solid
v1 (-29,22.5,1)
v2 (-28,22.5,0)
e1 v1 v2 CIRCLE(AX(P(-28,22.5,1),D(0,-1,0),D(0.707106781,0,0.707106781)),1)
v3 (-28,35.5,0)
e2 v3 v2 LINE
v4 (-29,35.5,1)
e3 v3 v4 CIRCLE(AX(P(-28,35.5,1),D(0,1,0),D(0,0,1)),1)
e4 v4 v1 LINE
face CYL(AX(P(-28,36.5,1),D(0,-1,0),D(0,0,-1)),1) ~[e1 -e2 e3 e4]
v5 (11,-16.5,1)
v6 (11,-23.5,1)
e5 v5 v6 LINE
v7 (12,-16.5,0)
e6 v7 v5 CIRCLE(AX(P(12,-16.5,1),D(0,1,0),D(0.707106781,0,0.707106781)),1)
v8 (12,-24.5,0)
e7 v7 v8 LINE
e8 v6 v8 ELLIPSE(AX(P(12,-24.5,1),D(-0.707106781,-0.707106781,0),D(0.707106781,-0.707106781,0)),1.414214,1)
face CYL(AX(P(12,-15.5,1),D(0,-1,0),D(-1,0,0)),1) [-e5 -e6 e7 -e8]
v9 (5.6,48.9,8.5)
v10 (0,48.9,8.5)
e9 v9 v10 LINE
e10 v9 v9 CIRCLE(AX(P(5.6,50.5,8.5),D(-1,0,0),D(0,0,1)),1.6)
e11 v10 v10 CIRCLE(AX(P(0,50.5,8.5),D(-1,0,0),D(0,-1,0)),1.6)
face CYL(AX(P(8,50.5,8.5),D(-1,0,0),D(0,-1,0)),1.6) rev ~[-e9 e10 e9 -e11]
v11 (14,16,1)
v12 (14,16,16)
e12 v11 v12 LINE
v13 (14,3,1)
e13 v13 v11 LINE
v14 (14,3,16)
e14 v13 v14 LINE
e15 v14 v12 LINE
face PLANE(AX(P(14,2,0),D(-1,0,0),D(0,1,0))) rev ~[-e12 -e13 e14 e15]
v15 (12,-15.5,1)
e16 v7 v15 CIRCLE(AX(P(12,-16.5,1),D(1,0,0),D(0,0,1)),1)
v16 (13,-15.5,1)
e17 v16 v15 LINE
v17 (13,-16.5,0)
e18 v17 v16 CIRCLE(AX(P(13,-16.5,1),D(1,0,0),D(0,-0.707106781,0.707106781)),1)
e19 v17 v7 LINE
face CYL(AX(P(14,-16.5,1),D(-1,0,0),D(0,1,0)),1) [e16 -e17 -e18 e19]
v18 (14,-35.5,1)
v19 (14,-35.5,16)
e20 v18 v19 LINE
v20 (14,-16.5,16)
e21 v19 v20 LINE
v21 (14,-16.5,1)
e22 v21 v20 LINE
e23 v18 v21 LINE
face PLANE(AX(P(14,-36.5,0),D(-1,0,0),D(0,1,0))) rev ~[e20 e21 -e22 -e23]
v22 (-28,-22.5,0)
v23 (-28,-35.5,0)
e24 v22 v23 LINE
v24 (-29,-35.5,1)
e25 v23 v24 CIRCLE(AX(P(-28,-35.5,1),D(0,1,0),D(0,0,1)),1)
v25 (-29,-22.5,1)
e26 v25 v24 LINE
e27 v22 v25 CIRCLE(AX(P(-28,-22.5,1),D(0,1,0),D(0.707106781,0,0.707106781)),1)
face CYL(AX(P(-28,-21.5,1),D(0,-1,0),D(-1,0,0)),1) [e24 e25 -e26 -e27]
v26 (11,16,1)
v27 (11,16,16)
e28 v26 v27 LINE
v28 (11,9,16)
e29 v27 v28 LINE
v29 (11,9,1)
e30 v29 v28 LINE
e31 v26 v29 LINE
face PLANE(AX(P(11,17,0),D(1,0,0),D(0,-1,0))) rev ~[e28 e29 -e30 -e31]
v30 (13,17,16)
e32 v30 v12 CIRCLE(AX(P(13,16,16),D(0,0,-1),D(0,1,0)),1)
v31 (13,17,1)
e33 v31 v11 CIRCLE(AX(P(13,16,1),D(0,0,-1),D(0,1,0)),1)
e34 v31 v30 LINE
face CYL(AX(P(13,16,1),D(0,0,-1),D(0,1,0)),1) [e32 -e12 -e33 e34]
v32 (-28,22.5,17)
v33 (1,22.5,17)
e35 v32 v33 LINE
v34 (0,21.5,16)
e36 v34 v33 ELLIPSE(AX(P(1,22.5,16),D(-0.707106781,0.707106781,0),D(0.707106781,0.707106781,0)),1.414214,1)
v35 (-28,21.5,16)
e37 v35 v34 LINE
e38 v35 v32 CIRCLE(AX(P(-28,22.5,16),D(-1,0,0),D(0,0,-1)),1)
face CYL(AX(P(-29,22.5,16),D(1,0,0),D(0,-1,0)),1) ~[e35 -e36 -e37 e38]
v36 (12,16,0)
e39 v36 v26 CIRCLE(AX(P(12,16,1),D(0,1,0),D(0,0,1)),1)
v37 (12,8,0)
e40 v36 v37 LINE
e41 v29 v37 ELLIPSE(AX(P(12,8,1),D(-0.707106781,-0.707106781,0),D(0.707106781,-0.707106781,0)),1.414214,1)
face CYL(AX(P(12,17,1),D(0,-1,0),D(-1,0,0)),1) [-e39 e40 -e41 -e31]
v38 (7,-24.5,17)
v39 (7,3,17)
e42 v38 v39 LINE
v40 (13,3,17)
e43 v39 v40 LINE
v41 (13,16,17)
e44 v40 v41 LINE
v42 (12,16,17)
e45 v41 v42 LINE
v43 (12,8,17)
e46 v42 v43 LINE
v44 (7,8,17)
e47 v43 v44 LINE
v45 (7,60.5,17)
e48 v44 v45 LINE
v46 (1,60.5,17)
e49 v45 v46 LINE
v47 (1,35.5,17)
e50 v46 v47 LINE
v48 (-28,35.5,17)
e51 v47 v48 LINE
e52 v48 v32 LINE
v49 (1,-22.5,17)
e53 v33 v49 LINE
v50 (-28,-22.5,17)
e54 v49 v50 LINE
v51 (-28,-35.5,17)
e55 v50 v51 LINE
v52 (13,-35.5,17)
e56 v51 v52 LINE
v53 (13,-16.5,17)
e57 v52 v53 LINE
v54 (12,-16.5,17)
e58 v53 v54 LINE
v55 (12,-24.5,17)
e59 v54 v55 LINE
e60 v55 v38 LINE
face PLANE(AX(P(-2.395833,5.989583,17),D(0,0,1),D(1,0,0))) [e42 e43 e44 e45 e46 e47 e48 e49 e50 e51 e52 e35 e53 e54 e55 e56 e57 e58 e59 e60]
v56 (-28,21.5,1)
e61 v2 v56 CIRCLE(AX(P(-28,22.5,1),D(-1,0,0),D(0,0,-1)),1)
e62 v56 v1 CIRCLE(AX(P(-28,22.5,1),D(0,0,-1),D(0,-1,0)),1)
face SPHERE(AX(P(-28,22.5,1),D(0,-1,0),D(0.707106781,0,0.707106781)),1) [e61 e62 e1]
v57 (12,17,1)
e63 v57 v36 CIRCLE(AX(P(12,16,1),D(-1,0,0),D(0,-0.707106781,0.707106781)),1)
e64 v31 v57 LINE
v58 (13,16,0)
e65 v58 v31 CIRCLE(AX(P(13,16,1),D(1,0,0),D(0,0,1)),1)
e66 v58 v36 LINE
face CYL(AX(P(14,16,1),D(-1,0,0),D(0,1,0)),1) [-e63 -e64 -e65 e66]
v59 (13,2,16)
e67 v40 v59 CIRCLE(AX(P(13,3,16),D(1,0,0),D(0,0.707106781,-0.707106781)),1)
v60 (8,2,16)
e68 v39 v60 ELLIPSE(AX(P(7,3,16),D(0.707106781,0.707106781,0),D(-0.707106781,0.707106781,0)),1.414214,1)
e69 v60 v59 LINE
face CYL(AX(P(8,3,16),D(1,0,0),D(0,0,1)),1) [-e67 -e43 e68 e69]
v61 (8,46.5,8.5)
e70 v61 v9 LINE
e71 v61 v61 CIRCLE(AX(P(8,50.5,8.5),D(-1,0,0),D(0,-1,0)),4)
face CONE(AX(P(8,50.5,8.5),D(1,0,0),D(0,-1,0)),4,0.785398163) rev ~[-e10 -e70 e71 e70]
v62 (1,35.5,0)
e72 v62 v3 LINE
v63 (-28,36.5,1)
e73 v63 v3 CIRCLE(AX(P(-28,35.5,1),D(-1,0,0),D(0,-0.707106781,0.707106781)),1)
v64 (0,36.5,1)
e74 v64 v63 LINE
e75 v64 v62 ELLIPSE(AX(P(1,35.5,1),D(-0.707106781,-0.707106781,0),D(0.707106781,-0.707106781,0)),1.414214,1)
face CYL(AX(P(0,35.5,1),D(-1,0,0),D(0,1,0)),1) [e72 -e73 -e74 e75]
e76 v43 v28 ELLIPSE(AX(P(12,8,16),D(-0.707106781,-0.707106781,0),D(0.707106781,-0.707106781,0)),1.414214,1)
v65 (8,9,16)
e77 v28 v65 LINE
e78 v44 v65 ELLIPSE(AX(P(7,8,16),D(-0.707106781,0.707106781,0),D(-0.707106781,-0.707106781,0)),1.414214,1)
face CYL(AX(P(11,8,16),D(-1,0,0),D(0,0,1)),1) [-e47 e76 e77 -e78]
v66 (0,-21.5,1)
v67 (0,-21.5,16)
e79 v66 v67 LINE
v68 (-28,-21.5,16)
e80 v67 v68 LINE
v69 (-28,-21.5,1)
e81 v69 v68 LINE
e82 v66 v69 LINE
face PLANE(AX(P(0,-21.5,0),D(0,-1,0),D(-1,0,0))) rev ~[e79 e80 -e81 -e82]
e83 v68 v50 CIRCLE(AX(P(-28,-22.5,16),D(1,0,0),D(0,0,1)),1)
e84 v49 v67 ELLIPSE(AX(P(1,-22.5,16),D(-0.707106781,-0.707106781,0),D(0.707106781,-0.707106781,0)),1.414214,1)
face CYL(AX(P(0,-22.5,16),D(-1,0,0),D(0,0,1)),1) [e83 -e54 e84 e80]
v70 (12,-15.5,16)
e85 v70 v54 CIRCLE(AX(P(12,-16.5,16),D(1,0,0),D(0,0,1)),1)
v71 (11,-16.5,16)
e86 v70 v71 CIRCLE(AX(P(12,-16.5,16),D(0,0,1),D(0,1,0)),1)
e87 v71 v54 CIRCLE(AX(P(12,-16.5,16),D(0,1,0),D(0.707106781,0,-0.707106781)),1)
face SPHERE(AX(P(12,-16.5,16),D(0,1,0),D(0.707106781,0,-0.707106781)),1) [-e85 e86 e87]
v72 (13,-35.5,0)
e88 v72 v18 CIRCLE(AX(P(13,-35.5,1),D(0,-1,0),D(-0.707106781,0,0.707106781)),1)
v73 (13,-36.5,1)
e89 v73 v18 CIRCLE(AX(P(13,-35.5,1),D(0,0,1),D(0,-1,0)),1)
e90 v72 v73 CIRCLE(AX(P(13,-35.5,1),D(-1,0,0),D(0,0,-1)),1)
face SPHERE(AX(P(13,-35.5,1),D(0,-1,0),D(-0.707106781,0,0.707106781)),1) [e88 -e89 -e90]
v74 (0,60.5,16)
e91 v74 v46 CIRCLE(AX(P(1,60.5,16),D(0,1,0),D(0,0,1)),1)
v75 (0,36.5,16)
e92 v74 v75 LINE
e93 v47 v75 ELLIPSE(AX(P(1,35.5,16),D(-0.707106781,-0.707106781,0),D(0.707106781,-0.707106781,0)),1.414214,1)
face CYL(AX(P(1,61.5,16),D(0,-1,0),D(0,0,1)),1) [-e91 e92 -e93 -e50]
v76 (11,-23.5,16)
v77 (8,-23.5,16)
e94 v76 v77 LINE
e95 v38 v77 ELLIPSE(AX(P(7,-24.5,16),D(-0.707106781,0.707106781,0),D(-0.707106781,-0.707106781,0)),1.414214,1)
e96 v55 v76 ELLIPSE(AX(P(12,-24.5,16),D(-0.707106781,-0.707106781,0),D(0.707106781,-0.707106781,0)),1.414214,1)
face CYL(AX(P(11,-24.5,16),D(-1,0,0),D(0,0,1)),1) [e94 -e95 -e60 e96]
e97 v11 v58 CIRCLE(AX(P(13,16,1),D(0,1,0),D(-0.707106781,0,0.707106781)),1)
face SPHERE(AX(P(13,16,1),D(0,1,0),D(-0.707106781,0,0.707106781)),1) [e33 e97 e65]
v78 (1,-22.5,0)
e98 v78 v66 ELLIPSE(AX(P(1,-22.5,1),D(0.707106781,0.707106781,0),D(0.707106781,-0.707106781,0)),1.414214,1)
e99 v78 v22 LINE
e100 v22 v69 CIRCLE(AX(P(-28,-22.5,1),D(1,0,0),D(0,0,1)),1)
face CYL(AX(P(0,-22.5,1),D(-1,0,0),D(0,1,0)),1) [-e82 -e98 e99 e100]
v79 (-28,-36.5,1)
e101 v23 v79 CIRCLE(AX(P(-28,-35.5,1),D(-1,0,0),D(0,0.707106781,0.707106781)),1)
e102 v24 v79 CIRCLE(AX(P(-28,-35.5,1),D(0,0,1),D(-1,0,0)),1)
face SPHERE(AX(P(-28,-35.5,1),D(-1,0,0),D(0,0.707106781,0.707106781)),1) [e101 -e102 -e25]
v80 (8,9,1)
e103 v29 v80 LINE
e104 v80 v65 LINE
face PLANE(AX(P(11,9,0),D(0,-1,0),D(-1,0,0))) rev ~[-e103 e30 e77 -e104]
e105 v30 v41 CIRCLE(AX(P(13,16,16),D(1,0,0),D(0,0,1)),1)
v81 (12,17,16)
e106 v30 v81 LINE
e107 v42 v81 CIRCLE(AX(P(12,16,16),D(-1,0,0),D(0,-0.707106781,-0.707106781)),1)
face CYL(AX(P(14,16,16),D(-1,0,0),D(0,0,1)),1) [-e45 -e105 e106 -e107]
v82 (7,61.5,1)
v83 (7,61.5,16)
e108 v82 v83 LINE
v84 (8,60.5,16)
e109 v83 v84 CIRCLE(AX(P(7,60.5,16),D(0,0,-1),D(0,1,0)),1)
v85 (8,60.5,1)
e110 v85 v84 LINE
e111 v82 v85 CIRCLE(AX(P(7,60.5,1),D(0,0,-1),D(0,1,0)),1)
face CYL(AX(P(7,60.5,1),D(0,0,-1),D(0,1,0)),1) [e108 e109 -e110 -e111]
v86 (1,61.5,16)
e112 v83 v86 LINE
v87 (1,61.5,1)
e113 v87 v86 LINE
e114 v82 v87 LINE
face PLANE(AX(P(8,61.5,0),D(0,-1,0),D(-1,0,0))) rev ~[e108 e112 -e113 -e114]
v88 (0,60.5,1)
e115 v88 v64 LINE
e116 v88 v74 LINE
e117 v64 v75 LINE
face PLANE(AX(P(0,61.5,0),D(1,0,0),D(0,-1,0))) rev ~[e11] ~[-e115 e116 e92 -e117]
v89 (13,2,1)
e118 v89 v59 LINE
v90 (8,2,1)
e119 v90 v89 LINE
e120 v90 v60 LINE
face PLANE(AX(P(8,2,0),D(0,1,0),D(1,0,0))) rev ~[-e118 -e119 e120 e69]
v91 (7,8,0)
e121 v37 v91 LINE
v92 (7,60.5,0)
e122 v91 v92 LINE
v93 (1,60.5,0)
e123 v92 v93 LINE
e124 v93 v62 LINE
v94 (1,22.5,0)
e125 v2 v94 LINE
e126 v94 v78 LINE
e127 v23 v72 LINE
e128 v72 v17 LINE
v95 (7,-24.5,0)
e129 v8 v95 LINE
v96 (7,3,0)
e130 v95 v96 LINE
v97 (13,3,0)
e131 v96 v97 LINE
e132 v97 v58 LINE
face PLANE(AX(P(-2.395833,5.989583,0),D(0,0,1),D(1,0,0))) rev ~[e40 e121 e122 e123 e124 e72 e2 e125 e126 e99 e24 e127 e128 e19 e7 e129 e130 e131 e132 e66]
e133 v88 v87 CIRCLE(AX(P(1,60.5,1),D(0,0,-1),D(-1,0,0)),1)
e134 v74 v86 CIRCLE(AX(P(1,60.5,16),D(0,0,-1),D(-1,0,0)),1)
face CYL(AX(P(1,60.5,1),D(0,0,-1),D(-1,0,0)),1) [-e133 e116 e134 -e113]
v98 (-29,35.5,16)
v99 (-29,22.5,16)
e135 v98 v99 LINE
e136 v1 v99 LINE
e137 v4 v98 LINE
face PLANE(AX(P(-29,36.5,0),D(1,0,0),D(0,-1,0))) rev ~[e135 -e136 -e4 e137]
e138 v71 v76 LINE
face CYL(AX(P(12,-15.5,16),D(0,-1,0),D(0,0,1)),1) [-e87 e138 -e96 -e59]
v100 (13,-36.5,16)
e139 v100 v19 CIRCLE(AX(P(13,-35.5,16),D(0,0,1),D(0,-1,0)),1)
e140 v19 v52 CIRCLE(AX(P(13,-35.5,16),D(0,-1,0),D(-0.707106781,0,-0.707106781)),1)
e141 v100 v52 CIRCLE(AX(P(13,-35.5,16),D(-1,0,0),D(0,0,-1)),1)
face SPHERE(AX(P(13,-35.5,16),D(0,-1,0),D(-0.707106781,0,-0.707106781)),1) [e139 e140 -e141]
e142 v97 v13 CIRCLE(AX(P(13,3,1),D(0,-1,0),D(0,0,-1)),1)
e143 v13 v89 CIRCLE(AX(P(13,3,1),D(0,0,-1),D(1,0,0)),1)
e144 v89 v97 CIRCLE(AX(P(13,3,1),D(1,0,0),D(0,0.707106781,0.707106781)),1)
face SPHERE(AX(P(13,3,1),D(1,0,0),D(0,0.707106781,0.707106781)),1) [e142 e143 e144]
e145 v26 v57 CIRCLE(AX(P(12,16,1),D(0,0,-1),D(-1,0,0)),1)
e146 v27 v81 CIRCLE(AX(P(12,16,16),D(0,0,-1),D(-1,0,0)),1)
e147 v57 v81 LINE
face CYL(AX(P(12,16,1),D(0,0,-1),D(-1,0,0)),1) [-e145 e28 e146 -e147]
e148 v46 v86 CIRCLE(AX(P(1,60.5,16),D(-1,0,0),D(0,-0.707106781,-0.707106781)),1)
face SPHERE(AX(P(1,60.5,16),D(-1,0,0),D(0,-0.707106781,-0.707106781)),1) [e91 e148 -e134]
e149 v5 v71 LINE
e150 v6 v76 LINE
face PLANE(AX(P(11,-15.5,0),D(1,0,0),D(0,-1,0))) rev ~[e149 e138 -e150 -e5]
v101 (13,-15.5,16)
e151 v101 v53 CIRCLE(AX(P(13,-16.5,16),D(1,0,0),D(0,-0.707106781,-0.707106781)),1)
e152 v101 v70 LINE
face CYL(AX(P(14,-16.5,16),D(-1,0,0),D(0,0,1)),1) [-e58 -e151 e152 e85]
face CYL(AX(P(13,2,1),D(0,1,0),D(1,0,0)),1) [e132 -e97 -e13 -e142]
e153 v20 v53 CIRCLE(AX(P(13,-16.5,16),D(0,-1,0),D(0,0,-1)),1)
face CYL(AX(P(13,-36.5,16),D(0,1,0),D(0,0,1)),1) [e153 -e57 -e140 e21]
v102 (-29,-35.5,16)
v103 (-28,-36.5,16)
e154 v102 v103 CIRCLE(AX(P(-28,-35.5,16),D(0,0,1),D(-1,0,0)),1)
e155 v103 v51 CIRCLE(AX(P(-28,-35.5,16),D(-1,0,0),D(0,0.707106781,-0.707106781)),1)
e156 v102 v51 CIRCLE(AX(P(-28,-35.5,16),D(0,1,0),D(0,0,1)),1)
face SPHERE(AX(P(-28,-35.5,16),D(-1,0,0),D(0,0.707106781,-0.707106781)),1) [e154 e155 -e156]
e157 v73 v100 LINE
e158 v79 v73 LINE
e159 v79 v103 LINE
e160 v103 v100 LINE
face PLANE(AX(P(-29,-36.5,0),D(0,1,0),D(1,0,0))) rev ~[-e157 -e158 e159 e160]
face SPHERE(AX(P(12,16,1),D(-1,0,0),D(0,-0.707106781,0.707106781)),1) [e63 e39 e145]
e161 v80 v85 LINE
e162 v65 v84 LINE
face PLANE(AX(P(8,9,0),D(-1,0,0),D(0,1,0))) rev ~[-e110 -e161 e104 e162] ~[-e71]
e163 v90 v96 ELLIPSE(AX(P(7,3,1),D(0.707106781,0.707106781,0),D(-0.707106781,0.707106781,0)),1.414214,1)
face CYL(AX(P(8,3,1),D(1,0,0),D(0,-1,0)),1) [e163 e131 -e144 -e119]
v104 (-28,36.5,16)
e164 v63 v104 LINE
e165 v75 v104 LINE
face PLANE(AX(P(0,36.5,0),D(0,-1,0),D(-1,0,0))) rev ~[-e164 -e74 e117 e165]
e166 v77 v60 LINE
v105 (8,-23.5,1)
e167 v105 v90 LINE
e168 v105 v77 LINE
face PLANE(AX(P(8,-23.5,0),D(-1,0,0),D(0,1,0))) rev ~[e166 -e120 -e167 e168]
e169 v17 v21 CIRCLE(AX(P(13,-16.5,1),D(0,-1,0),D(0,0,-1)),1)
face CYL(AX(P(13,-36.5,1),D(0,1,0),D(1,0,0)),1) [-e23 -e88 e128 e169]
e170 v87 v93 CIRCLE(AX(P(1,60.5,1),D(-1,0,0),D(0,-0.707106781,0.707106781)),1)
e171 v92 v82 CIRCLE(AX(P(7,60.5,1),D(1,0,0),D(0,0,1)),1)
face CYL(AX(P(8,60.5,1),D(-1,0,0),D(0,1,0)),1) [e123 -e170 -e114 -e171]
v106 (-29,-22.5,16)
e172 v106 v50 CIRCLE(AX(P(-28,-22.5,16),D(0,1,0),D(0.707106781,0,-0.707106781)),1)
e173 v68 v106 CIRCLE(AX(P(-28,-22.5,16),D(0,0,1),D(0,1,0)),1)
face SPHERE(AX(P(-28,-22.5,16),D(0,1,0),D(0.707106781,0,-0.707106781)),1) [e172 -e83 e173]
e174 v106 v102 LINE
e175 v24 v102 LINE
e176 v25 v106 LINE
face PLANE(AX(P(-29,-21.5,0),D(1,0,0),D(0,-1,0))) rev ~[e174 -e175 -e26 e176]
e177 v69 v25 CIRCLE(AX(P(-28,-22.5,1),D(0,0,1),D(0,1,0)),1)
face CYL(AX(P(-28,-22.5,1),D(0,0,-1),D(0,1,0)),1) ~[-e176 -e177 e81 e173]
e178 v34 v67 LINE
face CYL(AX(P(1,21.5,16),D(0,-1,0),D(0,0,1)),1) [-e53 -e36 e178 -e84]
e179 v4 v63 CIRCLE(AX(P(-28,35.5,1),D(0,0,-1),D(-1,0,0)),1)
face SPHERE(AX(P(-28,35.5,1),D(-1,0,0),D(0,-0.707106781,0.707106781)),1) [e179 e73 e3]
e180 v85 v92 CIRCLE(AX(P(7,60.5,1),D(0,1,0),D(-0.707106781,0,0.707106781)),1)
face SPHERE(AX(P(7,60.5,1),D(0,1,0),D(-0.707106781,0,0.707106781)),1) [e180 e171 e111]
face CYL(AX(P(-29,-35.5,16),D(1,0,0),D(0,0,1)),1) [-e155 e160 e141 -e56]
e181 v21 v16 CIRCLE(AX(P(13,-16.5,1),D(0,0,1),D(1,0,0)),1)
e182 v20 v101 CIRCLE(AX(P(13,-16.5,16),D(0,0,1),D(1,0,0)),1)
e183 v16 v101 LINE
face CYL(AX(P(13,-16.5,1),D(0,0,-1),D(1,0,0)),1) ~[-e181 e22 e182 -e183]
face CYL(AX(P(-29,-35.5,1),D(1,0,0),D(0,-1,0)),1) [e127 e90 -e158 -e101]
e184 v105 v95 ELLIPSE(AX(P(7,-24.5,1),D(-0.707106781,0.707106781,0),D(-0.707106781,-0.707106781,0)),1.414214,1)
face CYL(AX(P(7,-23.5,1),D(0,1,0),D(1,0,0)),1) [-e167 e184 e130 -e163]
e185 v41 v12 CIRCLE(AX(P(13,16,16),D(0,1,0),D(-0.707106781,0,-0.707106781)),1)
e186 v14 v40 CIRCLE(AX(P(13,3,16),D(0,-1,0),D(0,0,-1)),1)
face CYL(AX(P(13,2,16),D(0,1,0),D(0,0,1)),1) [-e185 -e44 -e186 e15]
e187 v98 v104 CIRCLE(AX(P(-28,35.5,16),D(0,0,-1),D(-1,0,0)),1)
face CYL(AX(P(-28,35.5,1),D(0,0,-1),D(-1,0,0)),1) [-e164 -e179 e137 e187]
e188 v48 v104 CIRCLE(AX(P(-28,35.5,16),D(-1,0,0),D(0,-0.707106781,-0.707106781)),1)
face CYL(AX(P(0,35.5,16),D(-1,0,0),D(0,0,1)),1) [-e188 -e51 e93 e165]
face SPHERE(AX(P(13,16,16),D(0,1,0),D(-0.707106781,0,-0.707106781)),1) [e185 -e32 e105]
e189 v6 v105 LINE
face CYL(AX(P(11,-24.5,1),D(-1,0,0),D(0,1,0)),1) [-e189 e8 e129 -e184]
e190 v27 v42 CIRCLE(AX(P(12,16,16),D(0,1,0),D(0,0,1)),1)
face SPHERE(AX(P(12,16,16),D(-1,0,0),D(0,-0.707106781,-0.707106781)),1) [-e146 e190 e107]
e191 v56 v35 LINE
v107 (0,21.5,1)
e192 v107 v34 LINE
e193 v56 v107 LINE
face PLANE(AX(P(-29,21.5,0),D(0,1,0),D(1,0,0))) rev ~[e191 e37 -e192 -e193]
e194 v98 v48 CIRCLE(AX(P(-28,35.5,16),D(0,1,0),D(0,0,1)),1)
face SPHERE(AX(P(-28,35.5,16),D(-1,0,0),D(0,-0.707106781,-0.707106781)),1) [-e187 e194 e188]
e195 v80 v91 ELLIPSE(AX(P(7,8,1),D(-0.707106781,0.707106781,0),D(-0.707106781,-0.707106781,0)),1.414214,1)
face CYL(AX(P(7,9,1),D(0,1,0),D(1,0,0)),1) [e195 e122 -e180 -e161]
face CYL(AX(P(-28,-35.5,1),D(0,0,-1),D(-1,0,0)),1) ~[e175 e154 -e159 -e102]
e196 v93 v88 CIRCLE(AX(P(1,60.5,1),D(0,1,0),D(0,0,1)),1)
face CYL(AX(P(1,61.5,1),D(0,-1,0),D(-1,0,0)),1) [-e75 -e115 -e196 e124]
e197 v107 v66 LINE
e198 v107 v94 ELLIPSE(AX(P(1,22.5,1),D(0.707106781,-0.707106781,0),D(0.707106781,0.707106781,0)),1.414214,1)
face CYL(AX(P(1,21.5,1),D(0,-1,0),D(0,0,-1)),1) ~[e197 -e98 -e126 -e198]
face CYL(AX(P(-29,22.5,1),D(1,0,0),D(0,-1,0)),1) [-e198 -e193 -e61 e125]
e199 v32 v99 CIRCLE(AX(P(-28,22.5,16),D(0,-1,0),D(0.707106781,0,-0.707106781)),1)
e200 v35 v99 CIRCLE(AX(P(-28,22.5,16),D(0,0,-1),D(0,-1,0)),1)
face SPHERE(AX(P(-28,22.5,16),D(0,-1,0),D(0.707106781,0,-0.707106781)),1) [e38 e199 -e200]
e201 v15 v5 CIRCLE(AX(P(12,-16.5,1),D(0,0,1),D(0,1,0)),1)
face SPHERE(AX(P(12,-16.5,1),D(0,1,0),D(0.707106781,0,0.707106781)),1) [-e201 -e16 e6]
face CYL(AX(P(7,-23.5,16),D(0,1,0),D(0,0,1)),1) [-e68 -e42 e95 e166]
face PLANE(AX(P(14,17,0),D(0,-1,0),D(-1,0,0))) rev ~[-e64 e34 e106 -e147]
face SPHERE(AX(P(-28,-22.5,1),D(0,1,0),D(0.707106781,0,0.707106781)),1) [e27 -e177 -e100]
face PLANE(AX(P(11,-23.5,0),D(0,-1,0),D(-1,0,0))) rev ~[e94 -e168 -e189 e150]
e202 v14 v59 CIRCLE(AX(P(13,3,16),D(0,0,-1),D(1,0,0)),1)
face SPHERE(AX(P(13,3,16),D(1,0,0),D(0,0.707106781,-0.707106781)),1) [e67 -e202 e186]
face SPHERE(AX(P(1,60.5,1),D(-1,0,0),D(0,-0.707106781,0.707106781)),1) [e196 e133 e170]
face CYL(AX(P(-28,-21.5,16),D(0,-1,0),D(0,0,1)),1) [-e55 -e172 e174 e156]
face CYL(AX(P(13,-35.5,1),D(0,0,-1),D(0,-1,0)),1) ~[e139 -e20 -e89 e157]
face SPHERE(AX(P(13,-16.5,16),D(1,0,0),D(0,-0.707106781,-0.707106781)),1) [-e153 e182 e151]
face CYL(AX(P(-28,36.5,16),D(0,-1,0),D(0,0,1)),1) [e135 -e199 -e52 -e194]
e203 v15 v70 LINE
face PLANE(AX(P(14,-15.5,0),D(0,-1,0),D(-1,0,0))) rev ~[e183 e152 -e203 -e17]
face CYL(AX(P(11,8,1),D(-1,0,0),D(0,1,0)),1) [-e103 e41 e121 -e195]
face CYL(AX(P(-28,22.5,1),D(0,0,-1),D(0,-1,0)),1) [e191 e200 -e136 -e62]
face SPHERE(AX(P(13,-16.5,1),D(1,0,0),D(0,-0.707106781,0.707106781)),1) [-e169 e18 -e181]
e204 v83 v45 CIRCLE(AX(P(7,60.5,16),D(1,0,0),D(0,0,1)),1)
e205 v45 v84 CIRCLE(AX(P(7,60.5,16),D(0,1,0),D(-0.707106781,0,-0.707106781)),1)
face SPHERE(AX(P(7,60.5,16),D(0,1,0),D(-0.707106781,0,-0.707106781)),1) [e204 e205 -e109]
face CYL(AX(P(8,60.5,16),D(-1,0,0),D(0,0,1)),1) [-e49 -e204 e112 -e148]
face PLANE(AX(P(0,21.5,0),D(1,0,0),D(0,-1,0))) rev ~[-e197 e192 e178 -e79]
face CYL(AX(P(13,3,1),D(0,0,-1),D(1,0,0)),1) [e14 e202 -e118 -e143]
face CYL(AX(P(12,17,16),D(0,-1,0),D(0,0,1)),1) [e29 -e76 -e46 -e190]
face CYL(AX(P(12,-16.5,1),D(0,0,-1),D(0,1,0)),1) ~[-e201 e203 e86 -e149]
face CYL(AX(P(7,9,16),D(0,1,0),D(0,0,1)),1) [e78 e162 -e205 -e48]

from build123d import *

# Parameters (mm, degrees)
F1_DEPTH       = 17
F3_D           = 3.2
F3_CSINK_D     = 8
F3_CSINK_ANGLE = 90
F4_R           = 1
F5_T1_DEPTH    = 15
F5_S5_W        = 1
F5_S5_H        = 1
F5_T6_DEPTH    = 1
F5_S11_W       = 1
F5_S11_H       = 1
F5_T12_DEPTH   = 1
F5_S17_W       = 1
F5_S17_H       = 1
F5_T18_DEPTH   = 1
F5_S23_W       = 1
F5_S23_H       = 1
F5_T24_DEPTH   = 1
F5_S29_W       = 1
F5_S29_H       = 1
F5_T30_DEPTH   = 1
F5_S35_W       = 1
F5_S35_H       = 1
F5_T36_DEPTH   = 1
F5_S41_W       = 1
F5_S41_H       = 1
F5_T42_DEPTH   = 1
F5_S47_W       = 1
F5_S47_H       = 1
F5_T48_DEPTH   = 1
F5_S53_W       = 1
F5_S53_H       = 1
F5_T54_DEPTH   = 1
F5_S59_W       = 1
F5_S59_H       = 1
F5_T60_DEPTH   = 1
F6_T1_DEPTH    = 15
F6_S5_W        = 1
F6_S5_H        = 1
F6_T6_DEPTH    = 1
F6_S11_W       = 1
F6_S11_H       = 1
F6_T12_DEPTH   = 1
F6_S17_W       = 1
F6_S17_H       = 1
F6_T18_DEPTH   = 1
F6_S23_W       = 1
F6_S23_H       = 1
F6_T24_DEPTH   = 1
F6_S29_W       = 1
F6_S29_H       = 1
F6_T30_DEPTH   = 1
F6_S35_W       = 1
F6_S35_H       = 1
F6_T36_DEPTH   = 1
F6_S41_W       = 1
F6_S41_H       = 1
F6_T42_DEPTH   = 1
F6_S47_W       = 1
F6_S47_H       = 1
F6_T48_DEPTH   = 1
F6_S53_W       = 1
F6_S53_H       = 1
F6_T54_DEPTH   = 1
F6_S59_W       = 1
F6_S59_H       = 1
F6_T60_DEPTH   = 1
F6_S65_W       = 1
F6_S65_H       = 1
F6_T66_DEPTH   = 1
F6_S71_W       = 1
F6_S71_H       = 1
F6_T72_DEPTH   = 1
F6_S77_W       = 1
F6_S77_H       = 1
F6_T78_DEPTH   = 1
F6_S83_W       = 1
F6_S83_H       = 1
F6_T84_DEPTH   = 1


# Not quite as in the source:
# - a fillet or chamfer that OpenCascade refuses, or shapes differently, is made with other operations: its cross-section is extruded or revolved along the edge and cut away or added


with BuildPart() as f1:
    # F0 (on Top) → F1 (new body)
    with BuildSketch(Plane.XY):
        Polygon((-29, 21.5), (0, 21.5), (0, -21.5), (-29, -21.5), (-29, -36.5), (14, -36.5), (14, -15.5), (11, -15.5), (11, -23.5), (8, -23.5), (8, 2), (14, 2), (14, 17), (11, 17), (11, 9), (8, 9), (8, 61.5), (0, 61.5), (0, 36.5), (-29, 36.5), align=None)
    extrude(amount=F1_DEPTH)

    # F3 (through all)
    with Locations(Plane.YZ.offset(8)):
        with Locations((50.5, 8.5)):
            CounterSinkHole(F3_D / 2, F3_CSINK_D / 2, counter_sink_angle=F3_CSINK_ANGLE)

    # F4
    f4_edges = [f1.edges().sort_by_distance(p)[0] for p in [
        (-14.5, 21.5, 17),
        (0, 0, 17),
        (-14.5, -21.5, 17),
        (-29, -29, 17),
        (-7.5, -36.5, 17),
        (14, -26, 17),
        (12.5, -15.5, 17),
        (11, -19.5, 17),
        (9.5, -23.5, 17),
        (8, -10.75, 17),
        (11, 2, 17),
        (14, 9.5, 17),
        (12.5, 17, 17),
        (11, 13, 17),
        (9.5, 9, 17),
        (8, 35.25, 17),
        (4, 61.5, 17),
        (0, 49, 17),
        (-14.5, 36.5, 17),
        (-29, 29, 17),
        (-14.5, 21.5, 0),
        (0, 0, 0),
        (-14.5, -21.5, 0),
        (-29, -29, 0),
        (-7.5, -36.5, 0),
        (14, -26, 0),
        (12.5, -15.5, 0),
        (11, -19.5, 0),
        (9.5, -23.5, 0),
        (8, -10.75, 0),
        (11, 2, 0),
        (14, 9.5, 0),
        (12.5, 17, 0),
        (11, 13, 0),
        (9.5, 9, 0),
        (8, 35.25, 0),
        (4, 61.5, 0),
        (0, 49, 0),
        (-14.5, 36.5, 0),
        (-29, 29, 0),
    ]]
    fillet(f4_edges, radius=F4_R)

    # F5: fillet of radius 1 on 5 edges, made by hand

    # F5_s2 → F5_t1 (cut)
    with BuildSketch(Plane.XY.offset(1)):
        with BuildLine():
            ThreePointArc((0, 60.5), (0.2928932188, 61.2071067812), (1, 61.5))
            Line((1, 61.5), (0, 61.5))
            Line((0, 61.5), (0, 60.5))
        make_face()
        with BuildLine():
            ThreePointArc((-29, 35.5), (-28.7071067812, 36.2071067812), (-28, 36.5))
            Line((-28, 36.5), (-29, 36.5))
            Line((-29, 36.5), (-29, 35.5))
        make_face()
        with BuildLine():
            ThreePointArc((-28, 21.5), (-28.7071067812, 21.7928932188), (-29, 22.5))
            Line((-29, 22.5), (-29, 21.5))
            Line((-29, 21.5), (-28, 21.5))
        make_face()
        with BuildLine():
            ThreePointArc((-28, -21.5), (-28.7071067812, -21.7928932188), (-29, -22.5))
            Line((-29, -22.5), (-29, -21.5))
            Line((-29, -21.5), (-28, -21.5))
        make_face()
        with BuildLine():
            ThreePointArc((-29, -35.5), (-28.7071067812, -36.2071067812), (-28, -36.5))
            Line((-28, -36.5), (-29, -36.5))
            Line((-29, -36.5), (-29, -35.5))
        make_face()
    extrude(amount=F5_T1_DEPTH, mode=Mode.SUBTRACT)


with BuildPart() as f5_tool4:
    # F5_s5 → F5_t6 (new body)
    with BuildSketch(Plane.YZ.offset(-28)):
        with Locations((-36, 0.5)):
            Rectangle(F5_S5_W, F5_S5_H)
    extrude(amount=-F5_T6_DEPTH)

    # F5_s7 → F5_t8 (revolve, cut)
    with BuildSketch(Plane(origin=(-28, -35.5, 1), x_dir=(0, 0.7071067812, 0.7071067812), z_dir=(0, -0.7071067812, 0.7071067812))):
        with BuildLine():
            ThreePointArc((0, -1), (1, 0), (0, 1))
            Line((0, 1), (0, -1))
        make_face()
    revolve(axis=Axis((-28, -35.5, 1), (-1, 0, 0)), mode=Mode.SUBTRACT)


with BuildPart() as f1_1:
    add(f1.part)

    # F5_t3: cut F5_tool4
    add(f5_tool4.part, mode=Mode.SUBTRACT)


with BuildPart() as f5_tool10:
    # F5_s11 → F5_t12 (new body)
    with BuildSketch(Plane.YZ.offset(-28)):
        with Locations((-36, 16.5)):
            Rectangle(F5_S11_W, F5_S11_H)
    extrude(amount=-F5_T12_DEPTH)

    # F5_s13 → F5_t14 (revolve, cut)
    with BuildSketch(Plane(origin=(-28, -35.5, 16), x_dir=(0, 0.7071067812, -0.7071067812), z_dir=(0, 0.7071067812, 0.7071067812))):
        with BuildLine():
            ThreePointArc((0, -1), (1, 0), (0, 1))
            Line((0, 1), (0, -1))
        make_face()
    revolve(axis=Axis((-28, -35.5, 16), (-1, 0, 0)), mode=Mode.SUBTRACT)


with BuildPart() as f1_2:
    add(f1_1.part)

    # F5_t9: cut F5_tool10
    add(f5_tool10.part, mode=Mode.SUBTRACT)


with BuildPart() as f5_tool16:
    # F5_s17 → F5_t18 (new body)
    with BuildSketch(Plane.XZ.offset(22.5)):
        with Locations((-28.5, 0.5)):
            Rectangle(F5_S17_W, F5_S17_H)
    extrude(amount=-F5_T18_DEPTH)

    # F5_s19 → F5_t20 (revolve, cut)
    with BuildSketch(Plane(origin=(-28, -22.5, 1), x_dir=(0.7071067812, 0, 0.7071067812), z_dir=(-0.7071067812, 0, 0.7071067812))):
        with BuildLine():
            ThreePointArc((0, -1), (1, 0), (0, 1))
            Line((0, 1), (0, -1))
        make_face()
    revolve(axis=Axis((-28, -22.5, 1), (0, 1, 0)), mode=Mode.SUBTRACT)


with BuildPart() as f1_3:
    add(f1_2.part)

    # F5_t15: cut F5_tool16
    add(f5_tool16.part, mode=Mode.SUBTRACT)


with BuildPart() as f5_tool22:
    # F5_s23 → F5_t24 (new body)
    with BuildSketch(Plane.XZ.offset(22.5)):
        with Locations((-28.5, 16.5)):
            Rectangle(F5_S23_W, F5_S23_H)
    extrude(amount=-F5_T24_DEPTH)

    # F5_s25 → F5_t26 (revolve, cut)
    with BuildSketch(Plane(origin=(-28, -22.5, 16), x_dir=(0.7071067812, 0, -0.7071067812), z_dir=(0.7071067812, 0, 0.7071067812))):
        with BuildLine():
            ThreePointArc((0, -1), (1, 0), (0, 1))
            Line((0, 1), (0, -1))
        make_face()
    revolve(axis=Axis((-28, -22.5, 16), (0, 1, 0)), mode=Mode.SUBTRACT)


with BuildPart() as f1_4:
    add(f1_3.part)

    # F5_t21: cut F5_tool22
    add(f5_tool22.part, mode=Mode.SUBTRACT)


with BuildPart() as f5_tool28:
    # F5_s29 → F5_t30 (new body)
    with BuildSketch(Plane.XZ.offset(-22.5)):
        with Locations((-28.5, 0.5)):
            Rectangle(F5_S29_W, F5_S29_H)
    extrude(amount=F5_T30_DEPTH)

    # F5_s31 → F5_t32 (revolve, cut)
    with BuildSketch(Plane(origin=(-28, 22.5, 1), x_dir=(0.7071067812, 0, 0.7071067812), z_dir=(0.7071067812, 0, -0.7071067812))):
        with BuildLine():
            ThreePointArc((0, -1), (1, 0), (0, 1))
            Line((0, 1), (0, -1))
        make_face()
    revolve(axis=Axis((-28, 22.5, 1), (0, -1, 0)), mode=Mode.SUBTRACT)


with BuildPart() as f1_5:
    add(f1_4.part)

    # F5_t27: cut F5_tool28
    add(f5_tool28.part, mode=Mode.SUBTRACT)


with BuildPart() as f5_tool34:
    # F5_s35 → F5_t36 (new body)
    with BuildSketch(Plane.XZ.offset(-22.5)):
        with Locations((-28.5, 16.5)):
            Rectangle(F5_S35_W, F5_S35_H)
    extrude(amount=F5_T36_DEPTH)

    # F5_s37 → F5_t38 (revolve, cut)
    with BuildSketch(Plane(origin=(-28, 22.5, 16), x_dir=(0.7071067812, 0, -0.7071067812), z_dir=(-0.7071067812, 0, -0.7071067812))):
        with BuildLine():
            ThreePointArc((0, -1), (1, 0), (0, 1))
            Line((0, 1), (0, -1))
        make_face()
    revolve(axis=Axis((-28, 22.5, 16), (0, -1, 0)), mode=Mode.SUBTRACT)


with BuildPart() as f1_6:
    add(f1_5.part)

    # F5_t33: cut F5_tool34
    add(f5_tool34.part, mode=Mode.SUBTRACT)


with BuildPart() as f5_tool40:
    # F5_s41 → F5_t42 (new body)
    with BuildSketch(Plane.YZ.offset(-28)):
        with Locations((36, 0.5)):
            Rectangle(F5_S41_W, F5_S41_H)
    extrude(amount=-F5_T42_DEPTH)

    # F5_s43 → F5_t44 (revolve, cut)
    with BuildSketch(Plane(origin=(-28, 35.5, 1), x_dir=(0, -0.7071067812, 0.7071067812), z_dir=(0, -0.7071067812, -0.7071067812))):
        with BuildLine():
            ThreePointArc((0, -1), (1, 0), (0, 1))
            Line((0, 1), (0, -1))
        make_face()
    revolve(axis=Axis((-28, 35.5, 1), (-1, 0, 0)), mode=Mode.SUBTRACT)


with BuildPart() as f1_7:
    add(f1_6.part)

    # F5_t39: cut F5_tool40
    add(f5_tool40.part, mode=Mode.SUBTRACT)


with BuildPart() as f5_tool46:
    # F5_s47 → F5_t48 (new body)
    with BuildSketch(Plane.YZ.offset(-28)):
        with Locations((36, 16.5)):
            Rectangle(F5_S47_W, F5_S47_H)
    extrude(amount=-F5_T48_DEPTH)

    # F5_s49 → F5_t50 (revolve, cut)
    with BuildSketch(Plane(origin=(-28, 35.5, 16), x_dir=(0, -0.7071067812, -0.7071067812), z_dir=(0, 0.7071067812, -0.7071067812))):
        with BuildLine():
            ThreePointArc((0, -1), (1, 0), (0, 1))
            Line((0, 1), (0, -1))
        make_face()
    revolve(axis=Axis((-28, 35.5, 16), (-1, 0, 0)), mode=Mode.SUBTRACT)


with BuildPart() as f1_8:
    add(f1_7.part)

    # F5_t45: cut F5_tool46
    add(f5_tool46.part, mode=Mode.SUBTRACT)


with BuildPart() as f5_tool52:
    # F5_s53 → F5_t54 (new body)
    with BuildSketch(Plane.YZ.offset(1)):
        with Locations((61, 0.5)):
            Rectangle(F5_S53_W, F5_S53_H)
    extrude(amount=-F5_T54_DEPTH)

    # F5_s55 → F5_t56 (revolve, cut)
    with BuildSketch(Plane(origin=(1, 60.5, 1), x_dir=(0, -0.7071067812, 0.7071067812), z_dir=(0, -0.7071067812, -0.7071067812))):
        with BuildLine():
            ThreePointArc((0, -1), (1, 0), (0, 1))
            Line((0, 1), (0, -1))
        make_face()
    revolve(axis=Axis((1, 60.5, 1), (-1, 0, 0)), mode=Mode.SUBTRACT)


with BuildPart() as f1_9:
    add(f1_8.part)

    # F5_t51: cut F5_tool52
    add(f5_tool52.part, mode=Mode.SUBTRACT)


with BuildPart() as f5_tool58:
    # F5_s59 → F5_t60 (new body)
    with BuildSketch(Plane.YZ.offset(1)):
        with Locations((61, 16.5)):
            Rectangle(F5_S59_W, F5_S59_H)
    extrude(amount=-F5_T60_DEPTH)

    # F5_s61 → F5_t62 (revolve, cut)
    with BuildSketch(Plane(origin=(1, 60.5, 16), x_dir=(0, -0.7071067812, -0.7071067812), z_dir=(0, 0.7071067812, -0.7071067812))):
        with BuildLine():
            ThreePointArc((0, -1), (1, 0), (0, 1))
            Line((0, 1), (0, -1))
        make_face()
    revolve(axis=Axis((1, 60.5, 16), (-1, 0, 0)), mode=Mode.SUBTRACT)


with BuildPart() as f1_10:
    add(f1_9.part)

    # F5_t57: cut F5_tool58
    add(f5_tool58.part, mode=Mode.SUBTRACT)

    # F6: fillet of radius 1 on 7 edges, made by hand

    # F6_s2 → F6_t1 (cut)
    with BuildSketch(Plane.XY.offset(1)):
        with BuildLine():
            ThreePointArc((11, 16), (11.2928932188, 16.7071067812), (12, 17))
            Line((12, 17), (11, 17))
            Line((11, 17), (11, 16))
        make_face()
        with BuildLine():
            ThreePointArc((13, 17), (13.7071067812, 16.7071067812), (14, 16))
            Line((14, 16), (14, 17))
            Line((14, 17), (13, 17))
        make_face()
        with BuildLine():
            ThreePointArc((12, -15.5), (11.2928932188, -15.7928932188), (11, -16.5))
            Line((11, -16.5), (11, -15.5))
            Line((11, -15.5), (12, -15.5))
        make_face()
        with BuildLine():
            ThreePointArc((14, -16.5), (13.7071067812, -15.7928932188), (13, -15.5))
            Line((13, -15.5), (14, -15.5))
            Line((14, -15.5), (14, -16.5))
        make_face()
        with BuildLine():
            ThreePointArc((14, 3), (13.7071067812, 2.2928932188), (13, 2))
            Line((13, 2), (14, 2))
            Line((14, 2), (14, 3))
        make_face()
        with BuildLine():
            ThreePointArc((13, -36.5), (13.7071067812, -36.2071067812), (14, -35.5))
            Line((14, -35.5), (14, -36.5))
            Line((14, -36.5), (13, -36.5))
        make_face()
        with BuildLine():
            ThreePointArc((7, 61.5), (7.7071067812, 61.2071067812), (8, 60.5))
            Line((8, 60.5), (8, 61.5))
            Line((8, 61.5), (7, 61.5))
        make_face()
    extrude(amount=F6_T1_DEPTH, mode=Mode.SUBTRACT)


with BuildPart() as f6_tool4:
    # F6_s5 → F6_t6 (new body)
    with BuildSketch(Plane.XZ.offset(-60.5)):
        with Locations((7.5, 0.5)):
            Rectangle(F6_S5_W, F6_S5_H)
    extrude(amount=-F6_T6_DEPTH)

    # F6_s7 → F6_t8 (revolve, cut)
    with BuildSketch(Plane(origin=(7, 60.5, 1), x_dir=(-0.7071067812, 0, 0.7071067812), z_dir=(-0.7071067812, 0, -0.7071067812))):
        with BuildLine():
            ThreePointArc((0, -1), (1, 0), (0, 1))
            Line((0, 1), (0, -1))
        make_face()
    revolve(axis=Axis((7, 60.5, 1), (0, 1, 0)), mode=Mode.SUBTRACT)


with BuildPart() as f1_11:
    add(f1_10.part)

    # F6_t3: cut F6_tool4
    add(f6_tool4.part, mode=Mode.SUBTRACT)


with BuildPart() as f6_tool10:
    # F6_s11 → F6_t12 (new body)
    with BuildSketch(Plane.XZ.offset(-60.5)):
        with Locations((7.5, 16.5)):
            Rectangle(F6_S11_W, F6_S11_H)
    extrude(amount=-F6_T12_DEPTH)

    # F6_s13 → F6_t14 (revolve, cut)
    with BuildSketch(Plane(origin=(7, 60.5, 16), x_dir=(-0.7071067812, 0, -0.7071067812), z_dir=(0.7071067812, 0, -0.7071067812))):
        with BuildLine():
            ThreePointArc((0, -1), (1, 0), (0, 1))
            Line((0, 1), (0, -1))
        make_face()
    revolve(axis=Axis((7, 60.5, 16), (0, 1, 0)), mode=Mode.SUBTRACT)


with BuildPart() as f1_12:
    add(f1_11.part)

    # F6_t9: cut F6_tool10
    add(f6_tool10.part, mode=Mode.SUBTRACT)


with BuildPart() as f6_tool16:
    # F6_s17 → F6_t18 (new body)
    with BuildSketch(Plane.XZ.offset(35.5)):
        with Locations((13.5, 0.5)):
            Rectangle(F6_S17_W, F6_S17_H)
    extrude(amount=F6_T18_DEPTH)

    # F6_s19 → F6_t20 (revolve, cut)
    with BuildSketch(Plane(origin=(13, -35.5, 1), x_dir=(-0.7071067812, 0, 0.7071067812), z_dir=(0.7071067812, 0, 0.7071067812))):
        with BuildLine():
            ThreePointArc((0, -1), (1, 0), (0, 1))
            Line((0, 1), (0, -1))
        make_face()
    revolve(axis=Axis((13, -35.5, 1), (0, -1, 0)), mode=Mode.SUBTRACT)


with BuildPart() as f1_13:
    add(f1_12.part)

    # F6_t15: cut F6_tool16
    add(f6_tool16.part, mode=Mode.SUBTRACT)


with BuildPart() as f6_tool22:
    # F6_s23 → F6_t24 (new body)
    with BuildSketch(Plane.XZ.offset(35.5)):
        with Locations((13.5, 16.5)):
            Rectangle(F6_S23_W, F6_S23_H)
    extrude(amount=F6_T24_DEPTH)

    # F6_s25 → F6_t26 (revolve, cut)
    with BuildSketch(Plane(origin=(13, -35.5, 16), x_dir=(-0.7071067812, 0, -0.7071067812), z_dir=(-0.7071067812, 0, 0.7071067812))):
        with BuildLine():
            ThreePointArc((0, -1), (1, 0), (0, 1))
            Line((0, 1), (0, -1))
        make_face()
    revolve(axis=Axis((13, -35.5, 16), (0, -1, 0)), mode=Mode.SUBTRACT)


with BuildPart() as f1_14:
    add(f1_13.part)

    # F6_t21: cut F6_tool22
    add(f6_tool22.part, mode=Mode.SUBTRACT)


with BuildPart() as f6_tool28:
    # F6_s29 → F6_t30 (new body)
    with BuildSketch(Plane.YZ.offset(13)):
        with Locations((2.5, 0.5)):
            Rectangle(F6_S29_W, F6_S29_H)
    extrude(amount=F6_T30_DEPTH)

    # F6_s31 → F6_t32 (revolve, cut)
    with BuildSketch(Plane(origin=(13, 3, 1), x_dir=(0, 0.7071067812, 0.7071067812), z_dir=(0, 0.7071067812, -0.7071067812))):
        with BuildLine():
            ThreePointArc((0, -1), (1, 0), (0, 1))
            Line((0, 1), (0, -1))
        make_face()
    revolve(axis=Axis((13, 3, 1), (1, 0, 0)), mode=Mode.SUBTRACT)


with BuildPart() as f1_15:
    add(f1_14.part)

    # F6_t27: cut F6_tool28
    add(f6_tool28.part, mode=Mode.SUBTRACT)


with BuildPart() as f6_tool34:
    # F6_s35 → F6_t36 (new body)
    with BuildSketch(Plane.YZ.offset(13)):
        with Locations((2.5, 16.5)):
            Rectangle(F6_S35_W, F6_S35_H)
    extrude(amount=F6_T36_DEPTH)

    # F6_s37 → F6_t38 (revolve, cut)
    with BuildSketch(Plane(origin=(13, 3, 16), x_dir=(0, 0.7071067812, -0.7071067812), z_dir=(0, -0.7071067812, -0.7071067812))):
        with BuildLine():
            ThreePointArc((0, -1), (1, 0), (0, 1))
            Line((0, 1), (0, -1))
        make_face()
    revolve(axis=Axis((13, 3, 16), (1, 0, 0)), mode=Mode.SUBTRACT)


with BuildPart() as f1_16:
    add(f1_15.part)

    # F6_t33: cut F6_tool34
    add(f6_tool34.part, mode=Mode.SUBTRACT)


with BuildPart() as f6_tool40:
    # F6_s41 → F6_t42 (new body)
    with BuildSketch(Plane.YZ.offset(13)):
        with Locations((-16, 0.5)):
            Rectangle(F6_S41_W, F6_S41_H)
    extrude(amount=F6_T42_DEPTH)

    # F6_s43 → F6_t44 (revolve, cut)
    with BuildSketch(Plane(origin=(13, -16.5, 1), x_dir=(0, -0.7071067812, 0.7071067812), z_dir=(0, 0.7071067812, 0.7071067812))):
        with BuildLine():
            ThreePointArc((0, -1), (1, 0), (0, 1))
            Line((0, 1), (0, -1))
        make_face()
    revolve(axis=Axis((13, -16.5, 1), (1, 0, 0)), mode=Mode.SUBTRACT)


with BuildPart() as f1_17:
    add(f1_16.part)

    # F6_t39: cut F6_tool40
    add(f6_tool40.part, mode=Mode.SUBTRACT)


with BuildPart() as f6_tool46:
    # F6_s47 → F6_t48 (new body)
    with BuildSketch(Plane.YZ.offset(13)):
        with Locations((-16, 16.5)):
            Rectangle(F6_S47_W, F6_S47_H)
    extrude(amount=F6_T48_DEPTH)

    # F6_s49 → F6_t50 (revolve, cut)
    with BuildSketch(Plane(origin=(13, -16.5, 16), x_dir=(0, -0.7071067812, -0.7071067812), z_dir=(0, -0.7071067812, 0.7071067812))):
        with BuildLine():
            ThreePointArc((0, -1), (1, 0), (0, 1))
            Line((0, 1), (0, -1))
        make_face()
    revolve(axis=Axis((13, -16.5, 16), (1, 0, 0)), mode=Mode.SUBTRACT)


with BuildPart() as f1_18:
    add(f1_17.part)

    # F6_t45: cut F6_tool46
    add(f6_tool46.part, mode=Mode.SUBTRACT)


with BuildPart() as f6_tool52:
    # F6_s53 → F6_t54 (new body)
    with BuildSketch(Plane.XZ.offset(16.5)):
        with Locations((11.5, 0.5)):
            Rectangle(F6_S53_W, F6_S53_H)
    extrude(amount=-F6_T54_DEPTH)

    # F6_s55 → F6_t56 (revolve, cut)
    with BuildSketch(Plane(origin=(12, -16.5, 1), x_dir=(0.7071067812, 0, 0.7071067812), z_dir=(-0.7071067812, 0, 0.7071067812))):
        with BuildLine():
            ThreePointArc((0, -1), (1, 0), (0, 1))
            Line((0, 1), (0, -1))
        make_face()
    revolve(axis=Axis((12, -16.5, 1), (0, 1, 0)), mode=Mode.SUBTRACT)


with BuildPart() as f1_19:
    add(f1_18.part)

    # F6_t51: cut F6_tool52
    add(f6_tool52.part, mode=Mode.SUBTRACT)


with BuildPart() as f6_tool58:
    # F6_s59 → F6_t60 (new body)
    with BuildSketch(Plane.XZ.offset(16.5)):
        with Locations((11.5, 16.5)):
            Rectangle(F6_S59_W, F6_S59_H)
    extrude(amount=-F6_T60_DEPTH)

    # F6_s61 → F6_t62 (revolve, cut)
    with BuildSketch(Plane(origin=(12, -16.5, 16), x_dir=(0.7071067812, 0, -0.7071067812), z_dir=(0.7071067812, 0, 0.7071067812))):
        with BuildLine():
            ThreePointArc((0, -1), (1, 0), (0, 1))
            Line((0, 1), (0, -1))
        make_face()
    revolve(axis=Axis((12, -16.5, 16), (0, 1, 0)), mode=Mode.SUBTRACT)


with BuildPart() as f1_20:
    add(f1_19.part)

    # F6_t57: cut F6_tool58
    add(f6_tool58.part, mode=Mode.SUBTRACT)


with BuildPart() as f6_tool64:
    # F6_s65 → F6_t66 (new body)
    with BuildSketch(Plane.XZ.offset(-16)):
        with Locations((13.5, 0.5)):
            Rectangle(F6_S65_W, F6_S65_H)
    extrude(amount=-F6_T66_DEPTH)

    # F6_s67 → F6_t68 (revolve, cut)
    with BuildSketch(Plane(origin=(13, 16, 1), x_dir=(-0.7071067812, 0, 0.7071067812), z_dir=(-0.7071067812, 0, -0.7071067812))):
        with BuildLine():
            ThreePointArc((0, -1), (1, 0), (0, 1))
            Line((0, 1), (0, -1))
        make_face()
    revolve(axis=Axis((13, 16, 1), (0, 1, 0)), mode=Mode.SUBTRACT)


with BuildPart() as f1_21:
    add(f1_20.part)

    # F6_t63: cut F6_tool64
    add(f6_tool64.part, mode=Mode.SUBTRACT)


with BuildPart() as f6_tool70:
    # F6_s71 → F6_t72 (new body)
    with BuildSketch(Plane.XZ.offset(-16)):
        with Locations((13.5, 16.5)):
            Rectangle(F6_S71_W, F6_S71_H)
    extrude(amount=-F6_T72_DEPTH)

    # F6_s73 → F6_t74 (revolve, cut)
    with BuildSketch(Plane(origin=(13, 16, 16), x_dir=(-0.7071067812, 0, -0.7071067812), z_dir=(0.7071067812, 0, -0.7071067812))):
        with BuildLine():
            ThreePointArc((0, -1), (1, 0), (0, 1))
            Line((0, 1), (0, -1))
        make_face()
    revolve(axis=Axis((13, 16, 16), (0, 1, 0)), mode=Mode.SUBTRACT)


with BuildPart() as f1_22:
    add(f1_21.part)

    # F6_t69: cut F6_tool70
    add(f6_tool70.part, mode=Mode.SUBTRACT)


with BuildPart() as f6_tool76:
    # F6_s77 → F6_t78 (new body)
    with BuildSketch(Plane.YZ.offset(12)):
        with Locations((16.5, 0.5)):
            Rectangle(F6_S77_W, F6_S77_H)
    extrude(amount=-F6_T78_DEPTH)

    # F6_s79 → F6_t80 (revolve, cut)
    with BuildSketch(Plane(origin=(12, 16, 1), x_dir=(0, -0.7071067812, 0.7071067812), z_dir=(0, -0.7071067812, -0.7071067812))):
        with BuildLine():
            ThreePointArc((0, -1), (1, 0), (0, 1))
            Line((0, 1), (0, -1))
        make_face()
    revolve(axis=Axis((12, 16, 1), (-1, 0, 0)), mode=Mode.SUBTRACT)


with BuildPart() as f1_23:
    add(f1_22.part)

    # F6_t75: cut F6_tool76
    add(f6_tool76.part, mode=Mode.SUBTRACT)


with BuildPart() as f6_tool82:
    # F6_s83 → F6_t84 (new body)
    with BuildSketch(Plane.YZ.offset(12)):
        with Locations((16.5, 16.5)):
            Rectangle(F6_S83_W, F6_S83_H)
    extrude(amount=-F6_T84_DEPTH)

    # F6_s85 → F6_t86 (revolve, cut)
    with BuildSketch(Plane(origin=(12, 16, 16), x_dir=(0, -0.7071067812, -0.7071067812), z_dir=(0, 0.7071067812, -0.7071067812))):
        with BuildLine():
            ThreePointArc((0, -1), (1, 0), (0, 1))
            Line((0, 1), (0, -1))
        make_face()
    revolve(axis=Axis((12, 16, 16), (-1, 0, 0)), mode=Mode.SUBTRACT)


with BuildPart() as f1_24:
    add(f1_23.part)

    # F6_t81: cut F6_tool82
    add(f6_tool82.part, mode=Mode.SUBTRACT)


solid = f1_24.part
